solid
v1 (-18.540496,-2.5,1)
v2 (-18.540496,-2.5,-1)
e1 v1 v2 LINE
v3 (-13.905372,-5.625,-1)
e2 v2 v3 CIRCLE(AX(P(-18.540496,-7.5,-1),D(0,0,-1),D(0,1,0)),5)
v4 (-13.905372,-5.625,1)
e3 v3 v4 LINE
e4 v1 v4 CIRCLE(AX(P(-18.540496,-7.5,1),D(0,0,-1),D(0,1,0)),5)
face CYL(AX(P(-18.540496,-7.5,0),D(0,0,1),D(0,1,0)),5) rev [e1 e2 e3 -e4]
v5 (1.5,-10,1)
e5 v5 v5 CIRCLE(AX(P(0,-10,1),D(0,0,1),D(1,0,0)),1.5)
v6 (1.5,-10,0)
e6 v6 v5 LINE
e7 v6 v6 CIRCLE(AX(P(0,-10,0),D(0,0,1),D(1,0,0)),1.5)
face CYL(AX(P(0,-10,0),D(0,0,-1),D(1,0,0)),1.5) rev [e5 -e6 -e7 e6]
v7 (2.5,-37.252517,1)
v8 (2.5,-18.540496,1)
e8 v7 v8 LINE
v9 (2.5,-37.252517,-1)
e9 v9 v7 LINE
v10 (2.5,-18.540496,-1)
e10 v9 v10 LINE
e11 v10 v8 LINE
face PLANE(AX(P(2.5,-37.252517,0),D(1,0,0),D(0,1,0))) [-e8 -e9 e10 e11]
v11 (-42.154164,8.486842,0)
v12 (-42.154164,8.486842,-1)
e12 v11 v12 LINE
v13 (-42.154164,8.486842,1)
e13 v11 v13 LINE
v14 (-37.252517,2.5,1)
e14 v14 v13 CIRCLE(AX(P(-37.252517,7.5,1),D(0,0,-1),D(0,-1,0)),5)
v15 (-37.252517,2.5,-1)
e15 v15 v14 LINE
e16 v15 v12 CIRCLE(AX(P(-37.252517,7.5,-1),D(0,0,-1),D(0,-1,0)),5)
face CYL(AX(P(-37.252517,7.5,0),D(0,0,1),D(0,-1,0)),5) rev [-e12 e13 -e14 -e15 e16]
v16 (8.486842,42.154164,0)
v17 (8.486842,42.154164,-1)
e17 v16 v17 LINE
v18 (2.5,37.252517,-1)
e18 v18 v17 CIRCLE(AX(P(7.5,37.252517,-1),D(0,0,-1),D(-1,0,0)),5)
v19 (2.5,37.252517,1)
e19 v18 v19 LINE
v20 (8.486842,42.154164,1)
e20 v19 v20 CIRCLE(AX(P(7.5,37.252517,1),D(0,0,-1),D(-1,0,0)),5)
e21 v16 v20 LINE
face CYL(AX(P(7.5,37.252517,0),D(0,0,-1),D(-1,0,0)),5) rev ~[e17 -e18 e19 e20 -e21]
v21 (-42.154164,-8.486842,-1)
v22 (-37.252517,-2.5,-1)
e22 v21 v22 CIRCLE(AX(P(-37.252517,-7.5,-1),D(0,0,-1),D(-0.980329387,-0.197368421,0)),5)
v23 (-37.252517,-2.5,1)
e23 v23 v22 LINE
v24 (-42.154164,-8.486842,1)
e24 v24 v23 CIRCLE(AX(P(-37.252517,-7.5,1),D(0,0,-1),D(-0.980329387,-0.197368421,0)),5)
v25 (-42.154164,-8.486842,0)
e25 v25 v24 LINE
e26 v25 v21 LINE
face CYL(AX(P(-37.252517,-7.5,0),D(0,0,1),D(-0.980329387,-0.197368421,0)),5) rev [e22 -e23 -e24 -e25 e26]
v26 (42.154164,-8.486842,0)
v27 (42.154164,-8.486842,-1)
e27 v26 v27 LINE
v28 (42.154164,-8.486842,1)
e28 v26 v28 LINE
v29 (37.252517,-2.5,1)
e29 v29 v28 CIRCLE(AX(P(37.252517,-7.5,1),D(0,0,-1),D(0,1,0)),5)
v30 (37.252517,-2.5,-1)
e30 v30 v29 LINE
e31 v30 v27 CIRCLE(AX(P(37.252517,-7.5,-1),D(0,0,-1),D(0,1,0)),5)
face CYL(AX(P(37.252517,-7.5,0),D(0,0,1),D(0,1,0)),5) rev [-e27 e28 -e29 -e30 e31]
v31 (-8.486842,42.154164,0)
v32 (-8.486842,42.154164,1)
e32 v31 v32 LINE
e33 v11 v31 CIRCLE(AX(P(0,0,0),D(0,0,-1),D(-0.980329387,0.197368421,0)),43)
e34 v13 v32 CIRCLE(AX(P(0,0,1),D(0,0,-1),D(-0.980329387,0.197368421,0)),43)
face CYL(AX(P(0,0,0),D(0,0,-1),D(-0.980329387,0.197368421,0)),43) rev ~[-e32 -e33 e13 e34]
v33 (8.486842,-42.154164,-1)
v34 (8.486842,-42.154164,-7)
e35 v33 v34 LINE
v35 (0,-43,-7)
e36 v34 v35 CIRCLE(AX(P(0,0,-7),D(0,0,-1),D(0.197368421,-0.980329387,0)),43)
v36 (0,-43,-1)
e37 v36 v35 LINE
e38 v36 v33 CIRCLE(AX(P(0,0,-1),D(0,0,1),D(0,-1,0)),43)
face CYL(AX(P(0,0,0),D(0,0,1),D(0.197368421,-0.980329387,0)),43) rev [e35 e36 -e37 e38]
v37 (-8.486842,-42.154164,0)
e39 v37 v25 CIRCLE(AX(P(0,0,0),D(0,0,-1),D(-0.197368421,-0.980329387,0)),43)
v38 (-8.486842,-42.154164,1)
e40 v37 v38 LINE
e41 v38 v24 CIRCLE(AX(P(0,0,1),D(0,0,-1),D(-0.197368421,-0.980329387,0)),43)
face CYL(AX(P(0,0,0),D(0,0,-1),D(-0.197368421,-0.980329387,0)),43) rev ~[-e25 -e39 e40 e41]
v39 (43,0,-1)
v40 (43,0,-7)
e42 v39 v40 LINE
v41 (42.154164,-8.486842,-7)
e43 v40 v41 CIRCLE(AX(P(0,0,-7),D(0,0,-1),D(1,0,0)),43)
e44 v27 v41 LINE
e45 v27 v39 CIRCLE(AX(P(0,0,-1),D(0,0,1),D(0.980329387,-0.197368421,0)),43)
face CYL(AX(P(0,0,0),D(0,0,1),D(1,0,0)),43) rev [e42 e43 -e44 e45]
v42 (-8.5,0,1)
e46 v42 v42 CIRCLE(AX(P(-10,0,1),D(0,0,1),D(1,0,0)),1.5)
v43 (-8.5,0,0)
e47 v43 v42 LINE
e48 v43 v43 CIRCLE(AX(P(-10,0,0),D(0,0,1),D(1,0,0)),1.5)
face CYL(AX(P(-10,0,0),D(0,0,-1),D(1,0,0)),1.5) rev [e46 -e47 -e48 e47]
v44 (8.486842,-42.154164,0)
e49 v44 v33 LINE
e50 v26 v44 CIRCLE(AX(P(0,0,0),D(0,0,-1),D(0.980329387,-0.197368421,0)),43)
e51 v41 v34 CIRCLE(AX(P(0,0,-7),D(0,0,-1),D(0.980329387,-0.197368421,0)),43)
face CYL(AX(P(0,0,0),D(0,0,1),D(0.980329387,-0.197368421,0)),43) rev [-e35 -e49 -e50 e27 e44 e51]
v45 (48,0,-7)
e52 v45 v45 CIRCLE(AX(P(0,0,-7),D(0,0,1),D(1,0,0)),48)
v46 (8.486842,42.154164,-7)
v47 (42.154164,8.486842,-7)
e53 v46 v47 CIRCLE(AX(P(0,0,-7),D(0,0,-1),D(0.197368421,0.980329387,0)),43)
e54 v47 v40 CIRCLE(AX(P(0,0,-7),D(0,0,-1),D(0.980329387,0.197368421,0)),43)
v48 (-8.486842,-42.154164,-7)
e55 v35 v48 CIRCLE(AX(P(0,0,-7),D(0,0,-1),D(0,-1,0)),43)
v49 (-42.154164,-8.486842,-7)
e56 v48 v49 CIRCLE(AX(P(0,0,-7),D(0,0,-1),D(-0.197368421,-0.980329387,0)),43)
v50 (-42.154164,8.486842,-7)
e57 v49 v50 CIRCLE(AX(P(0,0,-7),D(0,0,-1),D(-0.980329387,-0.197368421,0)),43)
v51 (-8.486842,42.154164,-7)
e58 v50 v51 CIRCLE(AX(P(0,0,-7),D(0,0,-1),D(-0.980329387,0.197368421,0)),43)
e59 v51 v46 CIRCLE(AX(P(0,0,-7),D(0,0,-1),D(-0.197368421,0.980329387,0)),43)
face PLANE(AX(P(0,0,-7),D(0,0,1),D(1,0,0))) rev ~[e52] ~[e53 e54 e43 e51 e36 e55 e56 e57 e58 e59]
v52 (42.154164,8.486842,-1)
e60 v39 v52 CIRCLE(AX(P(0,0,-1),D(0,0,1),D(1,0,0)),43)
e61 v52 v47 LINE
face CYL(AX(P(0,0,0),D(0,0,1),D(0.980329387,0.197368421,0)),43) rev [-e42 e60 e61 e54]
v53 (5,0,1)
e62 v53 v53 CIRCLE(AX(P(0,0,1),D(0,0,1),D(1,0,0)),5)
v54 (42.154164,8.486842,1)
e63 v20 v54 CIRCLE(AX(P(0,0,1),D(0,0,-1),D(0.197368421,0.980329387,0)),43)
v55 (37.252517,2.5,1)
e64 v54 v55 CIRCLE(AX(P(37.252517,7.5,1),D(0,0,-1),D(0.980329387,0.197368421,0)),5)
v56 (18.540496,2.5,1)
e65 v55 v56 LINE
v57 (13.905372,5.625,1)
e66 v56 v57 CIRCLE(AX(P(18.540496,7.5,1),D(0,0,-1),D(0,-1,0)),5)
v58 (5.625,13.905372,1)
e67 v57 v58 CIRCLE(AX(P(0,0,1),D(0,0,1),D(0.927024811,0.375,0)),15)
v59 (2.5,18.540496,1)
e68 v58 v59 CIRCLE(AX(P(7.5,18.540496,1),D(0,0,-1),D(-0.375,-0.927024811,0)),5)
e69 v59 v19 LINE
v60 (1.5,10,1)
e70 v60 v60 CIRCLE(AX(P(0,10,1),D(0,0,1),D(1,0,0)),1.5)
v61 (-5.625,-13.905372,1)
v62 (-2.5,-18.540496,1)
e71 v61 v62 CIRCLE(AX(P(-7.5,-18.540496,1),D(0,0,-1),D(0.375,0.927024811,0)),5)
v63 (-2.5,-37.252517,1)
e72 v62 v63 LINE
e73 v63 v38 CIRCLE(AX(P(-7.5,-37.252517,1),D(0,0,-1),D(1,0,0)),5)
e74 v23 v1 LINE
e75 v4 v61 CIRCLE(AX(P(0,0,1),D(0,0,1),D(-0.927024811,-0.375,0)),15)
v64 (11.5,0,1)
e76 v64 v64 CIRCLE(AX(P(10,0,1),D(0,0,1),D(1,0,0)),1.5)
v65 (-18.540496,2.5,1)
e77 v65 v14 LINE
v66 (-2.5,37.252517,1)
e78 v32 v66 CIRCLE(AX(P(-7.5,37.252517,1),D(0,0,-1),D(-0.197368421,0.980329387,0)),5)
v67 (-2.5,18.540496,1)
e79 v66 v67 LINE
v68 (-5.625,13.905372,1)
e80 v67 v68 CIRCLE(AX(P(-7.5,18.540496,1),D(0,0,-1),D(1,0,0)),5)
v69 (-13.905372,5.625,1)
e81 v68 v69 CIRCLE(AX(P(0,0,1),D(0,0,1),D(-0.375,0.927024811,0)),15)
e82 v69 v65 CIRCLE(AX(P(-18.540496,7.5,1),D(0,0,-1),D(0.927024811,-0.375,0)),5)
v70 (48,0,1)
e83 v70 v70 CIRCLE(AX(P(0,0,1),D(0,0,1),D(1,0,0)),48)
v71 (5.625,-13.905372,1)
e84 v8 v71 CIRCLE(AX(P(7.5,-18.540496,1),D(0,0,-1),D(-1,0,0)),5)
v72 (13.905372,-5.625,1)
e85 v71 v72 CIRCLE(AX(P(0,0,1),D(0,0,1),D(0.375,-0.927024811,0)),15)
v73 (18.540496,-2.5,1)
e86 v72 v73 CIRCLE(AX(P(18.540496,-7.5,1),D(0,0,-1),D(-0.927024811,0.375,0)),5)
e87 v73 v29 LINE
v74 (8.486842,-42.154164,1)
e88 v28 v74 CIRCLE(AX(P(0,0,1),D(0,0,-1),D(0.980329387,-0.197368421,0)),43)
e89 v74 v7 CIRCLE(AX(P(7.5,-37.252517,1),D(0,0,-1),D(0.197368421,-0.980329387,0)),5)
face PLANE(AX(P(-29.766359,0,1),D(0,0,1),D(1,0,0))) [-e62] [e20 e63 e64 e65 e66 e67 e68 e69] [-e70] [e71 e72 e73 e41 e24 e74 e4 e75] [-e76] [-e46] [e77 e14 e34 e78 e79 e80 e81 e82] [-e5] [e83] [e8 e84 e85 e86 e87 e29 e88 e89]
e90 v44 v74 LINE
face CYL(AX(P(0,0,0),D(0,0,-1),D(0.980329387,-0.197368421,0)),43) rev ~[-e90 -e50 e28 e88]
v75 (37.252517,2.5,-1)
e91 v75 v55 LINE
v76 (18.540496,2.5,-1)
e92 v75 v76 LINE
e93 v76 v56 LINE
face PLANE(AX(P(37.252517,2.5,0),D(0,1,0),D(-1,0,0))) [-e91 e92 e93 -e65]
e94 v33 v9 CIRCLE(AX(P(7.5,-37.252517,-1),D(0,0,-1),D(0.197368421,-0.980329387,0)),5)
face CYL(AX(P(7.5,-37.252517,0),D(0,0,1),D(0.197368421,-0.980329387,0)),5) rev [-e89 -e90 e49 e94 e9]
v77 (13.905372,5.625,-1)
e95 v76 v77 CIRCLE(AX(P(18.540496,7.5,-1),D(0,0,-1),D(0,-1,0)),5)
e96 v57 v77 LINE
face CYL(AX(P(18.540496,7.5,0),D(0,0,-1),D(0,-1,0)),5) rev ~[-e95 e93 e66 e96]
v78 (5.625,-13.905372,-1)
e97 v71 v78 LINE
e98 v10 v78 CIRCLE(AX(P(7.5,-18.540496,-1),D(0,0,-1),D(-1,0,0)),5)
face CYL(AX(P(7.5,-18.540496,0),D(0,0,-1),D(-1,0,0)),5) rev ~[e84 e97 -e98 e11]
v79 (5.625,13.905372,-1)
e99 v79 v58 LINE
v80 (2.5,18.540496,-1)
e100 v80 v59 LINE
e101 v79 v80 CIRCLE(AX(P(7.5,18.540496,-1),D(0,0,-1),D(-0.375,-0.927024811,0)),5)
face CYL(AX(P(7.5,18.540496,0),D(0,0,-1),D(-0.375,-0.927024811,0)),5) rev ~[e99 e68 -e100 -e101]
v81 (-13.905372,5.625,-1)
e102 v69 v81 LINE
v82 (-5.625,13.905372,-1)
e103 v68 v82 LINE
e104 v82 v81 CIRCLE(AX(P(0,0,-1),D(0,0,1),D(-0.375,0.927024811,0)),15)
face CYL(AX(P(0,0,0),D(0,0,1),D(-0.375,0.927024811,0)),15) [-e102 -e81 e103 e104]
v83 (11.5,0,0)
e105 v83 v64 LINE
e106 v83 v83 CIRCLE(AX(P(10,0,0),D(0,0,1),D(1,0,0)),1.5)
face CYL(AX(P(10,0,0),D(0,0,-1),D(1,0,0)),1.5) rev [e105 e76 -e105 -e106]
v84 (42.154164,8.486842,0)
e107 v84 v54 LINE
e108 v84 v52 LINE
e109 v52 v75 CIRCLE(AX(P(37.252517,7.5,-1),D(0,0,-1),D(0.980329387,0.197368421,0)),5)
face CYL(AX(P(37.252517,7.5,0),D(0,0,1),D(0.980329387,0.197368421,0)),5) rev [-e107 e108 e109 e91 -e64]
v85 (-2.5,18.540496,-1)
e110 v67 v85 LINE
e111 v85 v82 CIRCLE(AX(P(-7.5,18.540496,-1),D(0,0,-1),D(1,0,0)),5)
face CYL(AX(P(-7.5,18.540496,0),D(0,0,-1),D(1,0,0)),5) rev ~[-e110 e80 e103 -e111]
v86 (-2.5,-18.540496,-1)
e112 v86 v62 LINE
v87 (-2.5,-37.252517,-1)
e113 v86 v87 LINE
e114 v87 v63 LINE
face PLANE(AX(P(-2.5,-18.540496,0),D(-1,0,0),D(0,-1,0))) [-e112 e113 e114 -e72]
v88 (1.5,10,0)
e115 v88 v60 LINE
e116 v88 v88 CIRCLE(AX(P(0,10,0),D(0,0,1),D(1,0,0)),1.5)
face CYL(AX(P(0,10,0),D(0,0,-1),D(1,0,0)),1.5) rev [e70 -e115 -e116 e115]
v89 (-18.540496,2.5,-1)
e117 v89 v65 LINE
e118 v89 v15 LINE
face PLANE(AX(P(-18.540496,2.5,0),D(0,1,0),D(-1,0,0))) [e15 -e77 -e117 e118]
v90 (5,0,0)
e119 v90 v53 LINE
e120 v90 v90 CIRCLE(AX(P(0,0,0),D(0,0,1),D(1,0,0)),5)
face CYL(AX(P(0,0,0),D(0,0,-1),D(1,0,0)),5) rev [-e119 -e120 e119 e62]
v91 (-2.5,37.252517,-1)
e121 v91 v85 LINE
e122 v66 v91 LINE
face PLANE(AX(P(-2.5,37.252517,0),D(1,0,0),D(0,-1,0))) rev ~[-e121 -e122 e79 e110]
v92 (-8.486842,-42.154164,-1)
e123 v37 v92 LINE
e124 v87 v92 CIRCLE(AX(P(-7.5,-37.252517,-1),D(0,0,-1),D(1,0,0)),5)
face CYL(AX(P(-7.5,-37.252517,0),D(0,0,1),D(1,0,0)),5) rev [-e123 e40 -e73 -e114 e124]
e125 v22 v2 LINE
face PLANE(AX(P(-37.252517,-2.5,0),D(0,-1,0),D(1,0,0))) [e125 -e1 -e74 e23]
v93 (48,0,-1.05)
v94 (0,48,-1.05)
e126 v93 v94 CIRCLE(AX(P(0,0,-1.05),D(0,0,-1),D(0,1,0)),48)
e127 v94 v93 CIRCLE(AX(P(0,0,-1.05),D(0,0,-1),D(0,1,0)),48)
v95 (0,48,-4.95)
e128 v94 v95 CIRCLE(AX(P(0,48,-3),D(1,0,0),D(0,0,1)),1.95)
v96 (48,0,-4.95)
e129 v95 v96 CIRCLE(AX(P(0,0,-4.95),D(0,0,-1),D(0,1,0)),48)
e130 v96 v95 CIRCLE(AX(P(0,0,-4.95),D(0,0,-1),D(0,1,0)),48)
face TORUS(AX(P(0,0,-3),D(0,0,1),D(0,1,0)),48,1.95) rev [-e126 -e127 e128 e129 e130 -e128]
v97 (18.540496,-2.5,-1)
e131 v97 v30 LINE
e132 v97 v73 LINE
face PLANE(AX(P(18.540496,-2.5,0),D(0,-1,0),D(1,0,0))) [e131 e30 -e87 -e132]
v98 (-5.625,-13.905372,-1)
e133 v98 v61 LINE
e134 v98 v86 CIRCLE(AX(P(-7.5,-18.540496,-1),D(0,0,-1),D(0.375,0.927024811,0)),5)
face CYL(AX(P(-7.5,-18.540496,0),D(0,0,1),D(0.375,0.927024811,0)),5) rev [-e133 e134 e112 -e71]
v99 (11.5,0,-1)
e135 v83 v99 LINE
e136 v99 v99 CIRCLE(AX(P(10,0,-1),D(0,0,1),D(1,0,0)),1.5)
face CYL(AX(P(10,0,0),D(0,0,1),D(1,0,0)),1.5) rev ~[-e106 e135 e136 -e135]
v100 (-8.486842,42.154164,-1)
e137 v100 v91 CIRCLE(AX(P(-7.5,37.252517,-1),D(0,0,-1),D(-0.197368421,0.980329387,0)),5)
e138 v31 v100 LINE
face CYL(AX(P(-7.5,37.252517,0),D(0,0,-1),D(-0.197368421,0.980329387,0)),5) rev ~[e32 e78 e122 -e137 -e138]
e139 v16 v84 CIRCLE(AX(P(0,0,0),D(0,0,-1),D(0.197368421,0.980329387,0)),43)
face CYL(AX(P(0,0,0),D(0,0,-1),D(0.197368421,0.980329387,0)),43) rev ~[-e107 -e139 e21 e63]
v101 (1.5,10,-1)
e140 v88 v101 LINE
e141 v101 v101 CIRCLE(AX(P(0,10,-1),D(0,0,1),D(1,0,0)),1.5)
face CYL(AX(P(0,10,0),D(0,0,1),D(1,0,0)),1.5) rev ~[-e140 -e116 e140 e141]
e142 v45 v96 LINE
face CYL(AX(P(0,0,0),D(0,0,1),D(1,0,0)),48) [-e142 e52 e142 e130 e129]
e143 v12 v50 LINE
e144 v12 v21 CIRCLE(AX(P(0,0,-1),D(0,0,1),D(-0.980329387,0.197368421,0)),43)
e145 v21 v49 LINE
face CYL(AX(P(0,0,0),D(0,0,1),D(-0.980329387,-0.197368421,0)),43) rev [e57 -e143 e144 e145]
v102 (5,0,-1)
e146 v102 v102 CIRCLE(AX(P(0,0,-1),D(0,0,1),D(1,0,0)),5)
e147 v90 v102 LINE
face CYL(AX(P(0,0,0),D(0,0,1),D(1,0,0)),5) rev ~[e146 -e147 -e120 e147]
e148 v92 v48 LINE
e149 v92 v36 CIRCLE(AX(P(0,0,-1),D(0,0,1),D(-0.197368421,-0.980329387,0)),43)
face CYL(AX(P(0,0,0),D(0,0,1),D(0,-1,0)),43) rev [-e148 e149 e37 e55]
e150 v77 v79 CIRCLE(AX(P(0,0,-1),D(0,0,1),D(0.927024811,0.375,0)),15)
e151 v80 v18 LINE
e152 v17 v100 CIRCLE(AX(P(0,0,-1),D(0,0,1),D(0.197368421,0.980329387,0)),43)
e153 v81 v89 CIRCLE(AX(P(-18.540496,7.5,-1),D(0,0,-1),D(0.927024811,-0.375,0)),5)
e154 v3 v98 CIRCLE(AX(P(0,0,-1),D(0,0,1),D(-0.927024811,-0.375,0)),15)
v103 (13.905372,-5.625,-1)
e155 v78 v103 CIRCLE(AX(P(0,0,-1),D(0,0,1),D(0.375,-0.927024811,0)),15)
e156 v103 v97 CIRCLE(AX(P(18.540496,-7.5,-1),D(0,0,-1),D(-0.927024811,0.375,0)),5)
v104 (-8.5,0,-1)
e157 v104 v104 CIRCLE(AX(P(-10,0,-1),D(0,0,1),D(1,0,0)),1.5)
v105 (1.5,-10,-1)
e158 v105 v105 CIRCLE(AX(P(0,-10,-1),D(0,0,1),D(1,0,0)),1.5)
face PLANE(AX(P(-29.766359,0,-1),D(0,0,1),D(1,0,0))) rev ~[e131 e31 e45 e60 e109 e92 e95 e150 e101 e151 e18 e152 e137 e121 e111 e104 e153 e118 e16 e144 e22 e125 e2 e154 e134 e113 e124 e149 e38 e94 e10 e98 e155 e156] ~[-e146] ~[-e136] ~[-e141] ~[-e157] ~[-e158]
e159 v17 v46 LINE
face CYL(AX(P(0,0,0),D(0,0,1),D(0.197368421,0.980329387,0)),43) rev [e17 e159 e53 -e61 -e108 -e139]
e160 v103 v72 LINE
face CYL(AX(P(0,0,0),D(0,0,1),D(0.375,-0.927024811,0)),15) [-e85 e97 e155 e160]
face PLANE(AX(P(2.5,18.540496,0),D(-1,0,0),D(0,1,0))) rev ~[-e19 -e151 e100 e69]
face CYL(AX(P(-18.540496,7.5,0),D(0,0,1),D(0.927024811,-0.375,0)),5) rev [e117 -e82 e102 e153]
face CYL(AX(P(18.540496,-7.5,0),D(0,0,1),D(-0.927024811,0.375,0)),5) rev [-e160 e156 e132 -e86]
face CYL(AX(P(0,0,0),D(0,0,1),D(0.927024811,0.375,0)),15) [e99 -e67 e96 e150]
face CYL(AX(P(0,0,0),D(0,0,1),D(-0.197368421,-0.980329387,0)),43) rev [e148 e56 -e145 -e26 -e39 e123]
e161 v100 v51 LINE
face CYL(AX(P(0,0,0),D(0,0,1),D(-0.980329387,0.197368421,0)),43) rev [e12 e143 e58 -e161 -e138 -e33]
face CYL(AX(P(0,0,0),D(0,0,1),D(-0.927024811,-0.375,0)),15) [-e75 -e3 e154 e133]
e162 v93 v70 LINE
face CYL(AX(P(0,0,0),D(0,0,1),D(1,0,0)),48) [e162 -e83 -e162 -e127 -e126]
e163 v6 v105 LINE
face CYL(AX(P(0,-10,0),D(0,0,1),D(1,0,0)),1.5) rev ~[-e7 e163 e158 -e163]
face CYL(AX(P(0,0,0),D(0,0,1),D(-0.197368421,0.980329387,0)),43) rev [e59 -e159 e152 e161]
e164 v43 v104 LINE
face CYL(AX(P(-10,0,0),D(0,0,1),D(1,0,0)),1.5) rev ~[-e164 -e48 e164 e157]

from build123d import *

# Parameters (mm, degrees)
F0_R          = 48
F1_DEPTH      = 1
F1_DEPTH_BACK = 7
F0_R_2        = 1.5
F0_R_3        = 5
F2_DEPTH      = 1
F3_DEPTH      = 1


with BuildPart() as f1:
    # F0 (on Top) → F1 (new body, two sides)
    with BuildSketch(Plane.XY) as f1_sk:
        Circle(F0_R)
        with BuildLine():
            ThreePointArc((8.4868421053, -42.1541636269), (4.2644439289, -42.7880183927), (0, -43))
            ThreePointArc((0, -43), (-4.2644439289, -42.7880183927), (-8.4868421053, -42.1541636269))
            ThreePointArc((-8.4868421053, -42.1541636269), (-30.405591591, -30.405591591), (-42.1541636269, -8.4868421053))
            ThreePointArc((-42.1541636269, -8.4868421053), (-43, 0), (-42.1541636269, 8.4868421053))
            ThreePointArc((-42.1541636269, 8.4868421053), (-30.405591591, 30.405591591), (-8.4868421053, 42.1541636269))
            ThreePointArc((-8.4868421053, 42.1541636269), (0, 43), (8.4868421053, 42.1541636269))
            ThreePointArc((8.4868421053, 42.1541636269), (30.405591591, 30.405591591), (42.1541636269, 8.4868421053))
            ThreePointArc((42.1541636269, 8.4868421053), (42.7880183927, 4.2644439289), (43, 0))
            ThreePointArc((43, 0), (42.7880183927, -4.2644439289), (42.1541636269, -8.4868421053))
            ThreePointArc((42.1541636269, -8.4868421053), (30.405591591, -30.405591591), (8.4868421053, -42.1541636269))
        make_face(mode=Mode.SUBTRACT)
    extrude(amount=F1_DEPTH)
    extrude(f1_sk.sketch, amount=-F1_DEPTH_BACK)



with BuildPart() as f2:
    # F0 (on Top) → F2 (new body, symmetric)
    with BuildSketch(Plane.XY):
        with BuildLine():
            ThreePointArc((0, -15), (2.8652589369, -14.7238001625), (5.625, -13.9053721633))
            ThreePointArc((5.625, -13.9053721633), (10.6066017178, -10.6066017178), (13.9053721633, -5.625))
            ThreePointArc((13.9053721633, -5.625), (14.7238001625, -2.8652589369), (15, 0))
            ThreePointArc((15, 0), (14.7238001625, 2.8652589369), (13.9053721633, 5.625))
            ThreePointArc((13.9053721633, 5.625), (10.6066017178, 10.6066017178), (5.625, 13.9053721633))
            ThreePointArc((5.625, 13.9053721633), (0, 15), (-5.625, 13.9053721633))
            ThreePointArc((-5.625, 13.9053721633), (-10.6066017178, 10.6066017178), (-13.9053721633, 5.625))
            ThreePointArc((-13.9053721633, 5.625), (-15, 0), (-13.9053721633, -5.625))
            ThreePointArc((-13.9053721633, -5.625), (-10.6066017178, -10.6066017178), (-5.625, -13.9053721633))
            ThreePointArc((-5.625, -13.9053721633), (-2.8652589369, -14.7238001625), (0, -15))
        make_face()
        with Locations((0, -10)):
            Circle(F0_R_2, mode=Mode.SUBTRACT)
        with Locations((-10, 0)):
            Circle(F0_R_2, mode=Mode.SUBTRACT)
        Circle(F0_R_3, mode=Mode.SUBTRACT)
        with Locations((10, 0)):
            Circle(F0_R_2, mode=Mode.SUBTRACT)
        with Locations((0, 10)):
            Circle(F0_R_2, mode=Mode.SUBTRACT)
    extrude(amount=F2_DEPTH, both=True)


with BuildPart() as f1_1:
    add(f1.part)

    add(f2.part)  # F3 merges F2
    # F0 (on Top) → F3 (join, symmetric)
    with BuildSketch(Plane.XY):
        with BuildLine():
            Line((0, -43), (0, -15))
            ThreePointArc((0, -15), (-2.8652589369, -14.7238001625), (-5.625, -13.9053721633))
            ThreePointArc((-5.625, -13.9053721633), (-3.3542190121, -15.7454112459), (-2.5, -18.5404962177))
            Line((-2.5, -18.5404962177), (-2.5, -37.2525166935))
            ThreePointArc((-2.5, -37.2525166935), (-4.3325254955, -41.1212510167), (-8.4868421053, -42.1541636269))
            ThreePointArc((-8.4868421053, -42.1541636269), (-4.2644439289, -42.7880183927), (0, -43))
        make_face()
        with BuildLine():
            ThreePointArc((2.5, -18.5404962177), (3.3542190121, -15.7454112459), (5.625, -13.9053721633))
            ThreePointArc((5.625, -13.9053721633), (2.8652589369, -14.7238001625), (0, -15))
            Line((0, -15), (0, -43))
            ThreePointArc((0, -43), (4.2644439289, -42.7880183927), (8.4868421053, -42.1541636269))
            ThreePointArc((8.4868421053, -42.1541636269), (4.3325254955, -41.1212510167), (2.5, -37.2525166935))
            Line((2.5, -37.2525166935), (2.5, -18.5404962177))
        make_face()
        with BuildLine():
            ThreePointArc((15, 0), (14.7238001625, -2.8652589369), (13.9053721633, -5.625))
            ThreePointArc((13.9053721633, -5.625), (15.7454112459, -3.3542190121), (18.5404962177, -2.5))
            Line((18.5404962177, -2.5), (37.2525166935, -2.5))
            ThreePointArc((37.2525166935, -2.5), (41.1212510167, -4.3325254955), (42.1541636269, -8.4868421053))
            ThreePointArc((42.1541636269, -8.4868421053), (42.7880183927, -4.2644439289), (43, 0))
            Line((43, 0), (15, 0))
        make_face()
        with BuildLine():
            ThreePointArc((13.9053721633, 5.625), (14.7238001625, 2.8652589369), (15, 0))
            Line((15, 0), (43, 0))
            ThreePointArc((43, 0), (42.7880183927, 4.2644439289), (42.1541636269, 8.4868421053))
            ThreePointArc((42.1541636269, 8.4868421053), (41.1212510167, 4.3325254955), (37.2525166935, 2.5))
            Line((37.2525166935, 2.5), (18.5404962177, 2.5))
            ThreePointArc((18.5404962177, 2.5), (15.7454112459, 3.3542190121), (13.9053721633, 5.625))
        make_face()
        with BuildLine():
            ThreePointArc((-5.625, 13.9053721633), (0, 15), (5.625, 13.9053721633))
            ThreePointArc((5.625, 13.9053721633), (3.3542190121, 15.7454112459), (2.5, 18.5404962177))
            Line((2.5, 18.5404962177), (2.5, 37.2525166935))
            ThreePointArc((2.5, 37.2525166935), (4.3325254955, 41.1212510167), (8.4868421053, 42.1541636269))
            ThreePointArc((8.4868421053, 42.1541636269), (0, 43), (-8.4868421053, 42.1541636269))
            ThreePointArc((-8.4868421053, 42.1541636269), (-4.3325254955, 41.1212510167), (-2.5, 37.2525166935))
            Line((-2.5, 37.2525166935), (-2.5, 18.5404962177))
            ThreePointArc((-2.5, 18.5404962177), (-3.3542190121, 15.7454112459), (-5.625, 13.9053721633))
        make_face()
        with BuildLine():
            ThreePointArc((-18.5404962177, -2.5), (-15.7454112459, -3.3542190121), (-13.9053721633, -5.625))
            ThreePointArc((-13.9053721633, -5.625), (-15, 0), (-13.9053721633, 5.625))
            ThreePointArc((-13.9053721633, 5.625), (-15.7454112459, 3.3542190121), (-18.5404962177, 2.5))
            Line((-18.5404962177, 2.5), (-37.2525166935, 2.5))
            ThreePointArc((-37.2525166935, 2.5), (-41.1212510167, 4.3325254955), (-42.1541636269, 8.4868421053))
            ThreePointArc((-42.1541636269, 8.4868421053), (-43, 0), (-42.1541636269, -8.4868421053))
            ThreePointArc((-42.1541636269, -8.4868421053), (-41.1212510167, -4.3325254955), (-37.2525166935, -2.5))
            Line((-37.2525166935, -2.5), (-18.5404962177, -2.5))
        make_face()
    extrude(amount=F3_DEPTH, both=True)

    # F4 (on Right) → F5 (revolve, cut)
    with BuildSketch(Plane.YZ):
        with BuildLine():
            Line((48, -4.95), (48, -1.05))
            ThreePointArc((48, -1.05), (46.05, -3), (48, -4.95))
        make_face()
    revolve(axis=Axis((0, 0, -3.6724961751), (0, 0, -1)), mode=Mode.SUBTRACT)


solid = f1_1.part
